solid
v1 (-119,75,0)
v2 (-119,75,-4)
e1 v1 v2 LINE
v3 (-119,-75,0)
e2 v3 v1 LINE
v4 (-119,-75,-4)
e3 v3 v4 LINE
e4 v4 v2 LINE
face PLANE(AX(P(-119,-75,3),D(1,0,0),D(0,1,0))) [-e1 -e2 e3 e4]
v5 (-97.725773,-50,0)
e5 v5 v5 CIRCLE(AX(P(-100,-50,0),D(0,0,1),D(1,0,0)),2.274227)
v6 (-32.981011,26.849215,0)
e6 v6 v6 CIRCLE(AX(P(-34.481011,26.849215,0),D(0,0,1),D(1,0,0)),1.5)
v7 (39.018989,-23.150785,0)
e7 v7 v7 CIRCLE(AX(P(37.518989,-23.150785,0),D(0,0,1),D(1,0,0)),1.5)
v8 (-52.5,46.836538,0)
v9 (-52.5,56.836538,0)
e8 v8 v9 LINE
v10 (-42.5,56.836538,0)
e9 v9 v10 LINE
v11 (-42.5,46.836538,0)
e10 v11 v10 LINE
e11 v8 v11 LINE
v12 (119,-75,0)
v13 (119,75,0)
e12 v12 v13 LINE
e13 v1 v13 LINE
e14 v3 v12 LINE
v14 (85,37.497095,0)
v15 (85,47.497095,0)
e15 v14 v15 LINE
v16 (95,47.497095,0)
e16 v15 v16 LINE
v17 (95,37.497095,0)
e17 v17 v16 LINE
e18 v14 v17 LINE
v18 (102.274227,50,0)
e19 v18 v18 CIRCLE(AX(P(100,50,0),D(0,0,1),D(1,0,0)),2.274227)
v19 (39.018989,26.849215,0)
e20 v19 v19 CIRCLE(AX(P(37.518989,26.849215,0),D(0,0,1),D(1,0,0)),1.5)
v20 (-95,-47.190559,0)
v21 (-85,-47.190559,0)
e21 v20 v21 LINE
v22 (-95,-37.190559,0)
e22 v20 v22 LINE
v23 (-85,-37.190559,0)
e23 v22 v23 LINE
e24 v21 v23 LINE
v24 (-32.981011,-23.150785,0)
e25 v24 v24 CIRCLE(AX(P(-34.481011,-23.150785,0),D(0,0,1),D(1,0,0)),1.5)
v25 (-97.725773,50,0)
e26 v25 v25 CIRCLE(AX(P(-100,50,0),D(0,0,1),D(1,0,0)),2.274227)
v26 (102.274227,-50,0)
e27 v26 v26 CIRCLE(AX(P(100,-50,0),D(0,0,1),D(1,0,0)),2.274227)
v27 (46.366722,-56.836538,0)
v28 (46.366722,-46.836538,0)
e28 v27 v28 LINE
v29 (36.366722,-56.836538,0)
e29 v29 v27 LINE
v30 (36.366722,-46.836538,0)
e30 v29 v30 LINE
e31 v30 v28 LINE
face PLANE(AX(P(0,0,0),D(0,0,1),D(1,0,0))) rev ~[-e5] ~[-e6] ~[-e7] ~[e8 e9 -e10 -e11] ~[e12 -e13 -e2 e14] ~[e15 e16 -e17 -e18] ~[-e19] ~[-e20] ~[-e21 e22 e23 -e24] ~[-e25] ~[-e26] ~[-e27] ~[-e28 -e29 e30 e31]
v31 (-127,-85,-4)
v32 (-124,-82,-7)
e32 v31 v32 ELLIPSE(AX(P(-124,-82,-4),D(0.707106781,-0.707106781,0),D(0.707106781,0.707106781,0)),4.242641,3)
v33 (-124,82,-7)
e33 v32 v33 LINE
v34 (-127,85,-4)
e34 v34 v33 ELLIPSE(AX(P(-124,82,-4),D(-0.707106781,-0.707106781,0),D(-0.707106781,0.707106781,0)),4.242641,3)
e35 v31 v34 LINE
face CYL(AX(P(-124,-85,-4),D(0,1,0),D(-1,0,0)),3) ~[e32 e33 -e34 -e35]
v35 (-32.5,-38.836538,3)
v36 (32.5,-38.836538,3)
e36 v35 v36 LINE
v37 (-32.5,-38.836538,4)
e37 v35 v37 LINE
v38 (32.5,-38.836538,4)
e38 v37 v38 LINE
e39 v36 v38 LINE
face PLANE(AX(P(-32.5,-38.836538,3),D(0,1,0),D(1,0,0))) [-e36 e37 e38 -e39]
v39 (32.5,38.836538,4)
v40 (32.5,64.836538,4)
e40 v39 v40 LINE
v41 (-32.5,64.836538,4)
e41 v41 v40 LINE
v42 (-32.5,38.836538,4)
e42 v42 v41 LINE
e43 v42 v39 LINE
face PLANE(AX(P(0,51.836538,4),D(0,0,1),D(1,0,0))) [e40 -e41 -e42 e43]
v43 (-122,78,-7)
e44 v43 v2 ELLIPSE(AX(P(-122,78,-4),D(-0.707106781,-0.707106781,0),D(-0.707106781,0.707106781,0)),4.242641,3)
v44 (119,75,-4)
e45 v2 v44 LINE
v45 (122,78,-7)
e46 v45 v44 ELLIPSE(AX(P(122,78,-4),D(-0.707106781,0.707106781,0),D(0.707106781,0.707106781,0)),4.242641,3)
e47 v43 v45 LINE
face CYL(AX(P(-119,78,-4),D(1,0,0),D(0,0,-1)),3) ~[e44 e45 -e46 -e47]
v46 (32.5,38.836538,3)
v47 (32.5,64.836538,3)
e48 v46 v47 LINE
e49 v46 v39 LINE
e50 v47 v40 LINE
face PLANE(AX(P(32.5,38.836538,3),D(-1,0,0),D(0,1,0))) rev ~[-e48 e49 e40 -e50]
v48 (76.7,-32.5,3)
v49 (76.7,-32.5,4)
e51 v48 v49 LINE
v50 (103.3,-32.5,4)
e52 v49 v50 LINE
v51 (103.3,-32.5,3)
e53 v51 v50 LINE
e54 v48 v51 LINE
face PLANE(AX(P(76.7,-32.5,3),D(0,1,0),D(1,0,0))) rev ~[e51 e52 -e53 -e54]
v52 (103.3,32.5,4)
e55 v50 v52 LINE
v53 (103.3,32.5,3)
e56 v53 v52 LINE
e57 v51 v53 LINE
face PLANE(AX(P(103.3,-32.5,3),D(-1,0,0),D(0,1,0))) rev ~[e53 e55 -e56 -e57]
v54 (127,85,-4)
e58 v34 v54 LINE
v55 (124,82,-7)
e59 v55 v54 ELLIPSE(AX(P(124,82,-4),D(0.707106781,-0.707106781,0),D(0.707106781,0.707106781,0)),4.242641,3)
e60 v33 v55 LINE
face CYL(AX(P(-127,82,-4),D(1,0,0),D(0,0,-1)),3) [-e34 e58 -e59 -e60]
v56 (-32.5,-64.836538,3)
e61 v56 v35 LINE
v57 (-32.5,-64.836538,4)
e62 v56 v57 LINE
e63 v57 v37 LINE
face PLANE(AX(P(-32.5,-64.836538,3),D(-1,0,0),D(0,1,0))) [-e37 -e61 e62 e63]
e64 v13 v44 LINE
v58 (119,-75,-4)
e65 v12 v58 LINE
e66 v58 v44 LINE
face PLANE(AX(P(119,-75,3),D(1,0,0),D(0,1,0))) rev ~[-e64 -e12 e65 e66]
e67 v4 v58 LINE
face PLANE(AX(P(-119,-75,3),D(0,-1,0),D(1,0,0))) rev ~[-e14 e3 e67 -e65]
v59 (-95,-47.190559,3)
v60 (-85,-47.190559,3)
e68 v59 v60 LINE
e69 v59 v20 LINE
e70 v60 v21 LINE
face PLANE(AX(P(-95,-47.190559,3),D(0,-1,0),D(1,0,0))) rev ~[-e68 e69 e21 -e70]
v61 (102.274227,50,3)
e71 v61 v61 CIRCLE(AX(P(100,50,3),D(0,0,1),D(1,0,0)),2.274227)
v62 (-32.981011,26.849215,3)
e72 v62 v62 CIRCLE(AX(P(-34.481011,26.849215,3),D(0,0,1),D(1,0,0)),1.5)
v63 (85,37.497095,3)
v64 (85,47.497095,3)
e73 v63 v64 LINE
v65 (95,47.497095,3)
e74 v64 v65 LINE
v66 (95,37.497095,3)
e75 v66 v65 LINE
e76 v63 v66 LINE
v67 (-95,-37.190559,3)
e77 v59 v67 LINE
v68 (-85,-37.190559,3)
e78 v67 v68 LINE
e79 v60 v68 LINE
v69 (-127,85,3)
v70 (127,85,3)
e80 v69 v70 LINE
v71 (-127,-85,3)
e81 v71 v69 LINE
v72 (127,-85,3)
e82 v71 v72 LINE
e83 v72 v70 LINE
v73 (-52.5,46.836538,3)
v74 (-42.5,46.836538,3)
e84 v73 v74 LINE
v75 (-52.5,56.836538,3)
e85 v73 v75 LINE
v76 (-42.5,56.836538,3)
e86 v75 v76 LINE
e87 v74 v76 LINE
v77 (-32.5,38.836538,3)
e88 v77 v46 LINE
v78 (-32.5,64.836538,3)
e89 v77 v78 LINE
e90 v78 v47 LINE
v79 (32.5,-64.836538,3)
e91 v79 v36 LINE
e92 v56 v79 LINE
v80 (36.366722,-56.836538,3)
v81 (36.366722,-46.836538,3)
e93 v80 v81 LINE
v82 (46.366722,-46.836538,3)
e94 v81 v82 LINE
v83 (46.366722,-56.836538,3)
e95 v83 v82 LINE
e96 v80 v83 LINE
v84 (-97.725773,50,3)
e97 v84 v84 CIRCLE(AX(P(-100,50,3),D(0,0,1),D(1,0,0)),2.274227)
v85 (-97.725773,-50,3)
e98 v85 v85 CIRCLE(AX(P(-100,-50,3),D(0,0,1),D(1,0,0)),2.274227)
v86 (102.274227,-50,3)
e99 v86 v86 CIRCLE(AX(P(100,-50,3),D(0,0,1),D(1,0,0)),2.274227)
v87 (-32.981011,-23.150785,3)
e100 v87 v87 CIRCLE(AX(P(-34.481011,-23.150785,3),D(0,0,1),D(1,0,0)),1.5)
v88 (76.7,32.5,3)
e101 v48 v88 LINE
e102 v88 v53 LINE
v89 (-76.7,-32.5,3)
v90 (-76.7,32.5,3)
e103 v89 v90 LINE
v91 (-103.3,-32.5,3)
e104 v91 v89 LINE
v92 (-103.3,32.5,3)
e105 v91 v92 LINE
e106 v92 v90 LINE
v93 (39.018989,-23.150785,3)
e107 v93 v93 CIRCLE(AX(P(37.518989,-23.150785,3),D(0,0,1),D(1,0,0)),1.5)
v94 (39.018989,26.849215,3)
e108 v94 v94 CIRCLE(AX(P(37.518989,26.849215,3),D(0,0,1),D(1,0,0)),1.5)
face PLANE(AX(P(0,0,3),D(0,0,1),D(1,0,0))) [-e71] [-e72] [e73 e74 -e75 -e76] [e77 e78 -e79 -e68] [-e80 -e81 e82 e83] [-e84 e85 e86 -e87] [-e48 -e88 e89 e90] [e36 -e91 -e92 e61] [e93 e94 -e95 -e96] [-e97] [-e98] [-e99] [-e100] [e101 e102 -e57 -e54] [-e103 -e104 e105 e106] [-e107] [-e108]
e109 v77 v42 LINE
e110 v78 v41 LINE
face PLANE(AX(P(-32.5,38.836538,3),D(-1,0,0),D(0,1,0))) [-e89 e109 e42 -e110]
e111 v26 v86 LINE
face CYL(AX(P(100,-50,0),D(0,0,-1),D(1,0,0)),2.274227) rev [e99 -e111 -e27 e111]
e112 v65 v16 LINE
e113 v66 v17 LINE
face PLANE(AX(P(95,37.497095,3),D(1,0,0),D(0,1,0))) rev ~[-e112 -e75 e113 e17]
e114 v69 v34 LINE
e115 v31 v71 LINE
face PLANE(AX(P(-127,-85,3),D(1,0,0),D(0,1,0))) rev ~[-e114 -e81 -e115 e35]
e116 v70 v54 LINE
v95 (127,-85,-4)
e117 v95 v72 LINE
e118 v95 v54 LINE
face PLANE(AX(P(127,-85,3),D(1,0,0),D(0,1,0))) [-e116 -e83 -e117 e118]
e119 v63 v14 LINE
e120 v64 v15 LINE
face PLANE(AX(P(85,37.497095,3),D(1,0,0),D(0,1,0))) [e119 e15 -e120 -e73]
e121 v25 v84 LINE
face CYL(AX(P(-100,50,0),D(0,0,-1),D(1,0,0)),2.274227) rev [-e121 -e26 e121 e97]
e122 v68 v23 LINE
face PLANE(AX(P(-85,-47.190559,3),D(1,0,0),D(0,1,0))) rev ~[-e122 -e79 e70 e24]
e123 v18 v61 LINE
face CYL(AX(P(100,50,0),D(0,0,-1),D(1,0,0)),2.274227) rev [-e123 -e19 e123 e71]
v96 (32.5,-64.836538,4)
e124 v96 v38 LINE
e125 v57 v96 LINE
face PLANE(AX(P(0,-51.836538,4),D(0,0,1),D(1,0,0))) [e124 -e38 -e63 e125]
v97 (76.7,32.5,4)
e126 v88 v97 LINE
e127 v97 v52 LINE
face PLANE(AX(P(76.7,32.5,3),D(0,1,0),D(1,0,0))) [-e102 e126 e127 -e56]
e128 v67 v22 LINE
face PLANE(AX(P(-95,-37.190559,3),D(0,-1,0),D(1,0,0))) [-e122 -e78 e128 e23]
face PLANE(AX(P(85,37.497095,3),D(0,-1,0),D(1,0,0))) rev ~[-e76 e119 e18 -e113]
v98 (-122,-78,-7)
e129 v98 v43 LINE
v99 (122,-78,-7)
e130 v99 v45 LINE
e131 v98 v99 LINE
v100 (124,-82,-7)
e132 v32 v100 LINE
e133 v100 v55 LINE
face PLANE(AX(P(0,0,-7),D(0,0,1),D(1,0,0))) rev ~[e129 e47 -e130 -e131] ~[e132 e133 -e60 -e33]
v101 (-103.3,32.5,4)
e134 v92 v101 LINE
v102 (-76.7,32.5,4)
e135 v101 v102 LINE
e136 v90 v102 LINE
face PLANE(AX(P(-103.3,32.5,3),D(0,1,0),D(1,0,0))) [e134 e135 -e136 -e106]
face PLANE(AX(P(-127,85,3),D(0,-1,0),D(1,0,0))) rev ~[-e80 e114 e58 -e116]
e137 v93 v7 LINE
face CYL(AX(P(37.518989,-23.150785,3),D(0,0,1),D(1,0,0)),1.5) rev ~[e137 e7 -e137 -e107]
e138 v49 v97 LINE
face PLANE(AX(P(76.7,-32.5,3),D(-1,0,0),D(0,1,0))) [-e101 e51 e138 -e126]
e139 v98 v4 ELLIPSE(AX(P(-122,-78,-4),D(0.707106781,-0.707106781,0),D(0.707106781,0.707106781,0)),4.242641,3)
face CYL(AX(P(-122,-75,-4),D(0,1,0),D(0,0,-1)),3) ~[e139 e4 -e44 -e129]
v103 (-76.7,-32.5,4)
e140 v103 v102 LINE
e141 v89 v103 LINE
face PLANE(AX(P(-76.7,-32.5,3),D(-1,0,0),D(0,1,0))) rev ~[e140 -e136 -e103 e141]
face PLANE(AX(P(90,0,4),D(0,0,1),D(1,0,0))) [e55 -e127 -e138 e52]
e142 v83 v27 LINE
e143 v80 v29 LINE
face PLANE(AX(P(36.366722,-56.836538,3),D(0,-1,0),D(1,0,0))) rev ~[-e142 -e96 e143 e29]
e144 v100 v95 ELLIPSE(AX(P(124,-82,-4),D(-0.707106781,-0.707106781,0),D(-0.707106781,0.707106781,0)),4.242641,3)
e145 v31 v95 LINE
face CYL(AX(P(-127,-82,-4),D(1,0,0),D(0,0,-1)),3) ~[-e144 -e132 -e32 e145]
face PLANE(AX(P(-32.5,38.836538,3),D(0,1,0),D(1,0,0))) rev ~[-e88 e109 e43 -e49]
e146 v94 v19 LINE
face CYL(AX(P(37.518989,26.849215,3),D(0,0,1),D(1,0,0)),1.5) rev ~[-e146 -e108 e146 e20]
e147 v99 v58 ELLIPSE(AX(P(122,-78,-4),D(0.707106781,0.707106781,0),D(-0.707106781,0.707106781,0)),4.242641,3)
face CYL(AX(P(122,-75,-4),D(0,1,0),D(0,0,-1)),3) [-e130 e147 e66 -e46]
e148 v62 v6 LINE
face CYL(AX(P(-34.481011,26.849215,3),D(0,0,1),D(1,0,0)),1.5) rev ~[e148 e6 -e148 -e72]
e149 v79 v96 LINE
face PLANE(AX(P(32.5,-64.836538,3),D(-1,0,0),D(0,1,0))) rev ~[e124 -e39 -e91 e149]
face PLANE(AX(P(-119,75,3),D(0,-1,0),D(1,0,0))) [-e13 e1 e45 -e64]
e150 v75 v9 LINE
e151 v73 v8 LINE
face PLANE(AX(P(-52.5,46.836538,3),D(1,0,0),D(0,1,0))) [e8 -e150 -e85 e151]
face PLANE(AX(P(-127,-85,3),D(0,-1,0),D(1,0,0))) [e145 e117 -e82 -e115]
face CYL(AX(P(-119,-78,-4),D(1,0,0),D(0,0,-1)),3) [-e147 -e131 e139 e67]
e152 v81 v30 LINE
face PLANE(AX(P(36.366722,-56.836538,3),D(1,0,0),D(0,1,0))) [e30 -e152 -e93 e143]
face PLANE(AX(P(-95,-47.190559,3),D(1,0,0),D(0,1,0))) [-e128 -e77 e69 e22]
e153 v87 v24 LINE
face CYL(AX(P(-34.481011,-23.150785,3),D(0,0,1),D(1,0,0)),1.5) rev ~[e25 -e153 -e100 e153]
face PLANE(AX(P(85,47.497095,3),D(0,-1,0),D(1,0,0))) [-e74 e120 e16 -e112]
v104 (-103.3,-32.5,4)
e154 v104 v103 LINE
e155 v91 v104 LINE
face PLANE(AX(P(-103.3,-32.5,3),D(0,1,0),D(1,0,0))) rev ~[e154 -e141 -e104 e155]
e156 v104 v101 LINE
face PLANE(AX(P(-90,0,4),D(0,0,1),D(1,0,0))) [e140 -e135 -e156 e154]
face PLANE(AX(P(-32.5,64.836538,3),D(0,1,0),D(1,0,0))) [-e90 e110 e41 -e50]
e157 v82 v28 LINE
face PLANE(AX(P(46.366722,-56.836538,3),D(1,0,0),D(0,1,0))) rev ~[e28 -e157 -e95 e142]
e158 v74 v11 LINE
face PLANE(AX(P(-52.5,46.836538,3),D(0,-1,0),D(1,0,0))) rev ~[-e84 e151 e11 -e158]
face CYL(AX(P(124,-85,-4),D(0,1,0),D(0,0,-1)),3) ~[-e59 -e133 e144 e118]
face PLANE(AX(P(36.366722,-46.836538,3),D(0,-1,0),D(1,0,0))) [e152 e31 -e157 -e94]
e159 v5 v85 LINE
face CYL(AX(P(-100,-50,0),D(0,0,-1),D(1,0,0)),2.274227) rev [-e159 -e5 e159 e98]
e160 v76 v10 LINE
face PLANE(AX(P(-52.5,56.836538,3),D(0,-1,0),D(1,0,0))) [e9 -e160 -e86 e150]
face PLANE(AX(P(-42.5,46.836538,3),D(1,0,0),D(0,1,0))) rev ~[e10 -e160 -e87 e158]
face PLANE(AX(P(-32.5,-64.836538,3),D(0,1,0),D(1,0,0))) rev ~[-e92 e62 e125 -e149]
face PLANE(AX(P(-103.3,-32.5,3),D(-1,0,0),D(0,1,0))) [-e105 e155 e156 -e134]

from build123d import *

# Parameters (mm, degrees)
F0_W      = 254
F0_H      = 170
F0_R      = 2.2742272187
F1_DEPTH  = 3
F2_W      = 254
F2_H      = 170
F2_W_2    = 238
F2_H_2    = 150
F3_DEPTH  = 10
F4_R      = 3
F5_R      = 1.5
F6_DEPTH  = 25
F7_W      = 26.6
F7_H      = 65
F7_W_2    = 65
F7_H_2    = 26
F8_DEPTH  = 1
F9_W      = 10
F9_H      = 10
F10_DEPTH = 25


# Not quite as in the source:
# - a feature names something its author has since deleted; it is built from what else it names


with BuildPart() as f1:
    # F0 (on Top) → F1 (new body)
    with BuildSketch(Plane.XY):
        Rectangle(F0_W, F0_H)
        with Locations((-100, -50)):
            Circle(F0_R, mode=Mode.SUBTRACT)
        with Locations((100, -50)):
            Circle(F0_R, mode=Mode.SUBTRACT)
        with Locations((-100, 50)):
            Circle(F0_R, mode=Mode.SUBTRACT)
        with Locations((100, 50)):
            Circle(F0_R, mode=Mode.SUBTRACT)
    extrude(amount=F1_DEPTH)

    # F2 (on face) → F3 (join)
    with BuildSketch(Plane.XY.offset(3)):
        Rectangle(F2_W, F2_H)
        Rectangle(F2_W_2, F2_H_2, mode=Mode.SUBTRACT)
    extrude(amount=-F3_DEPTH)

    # F4
    f4_edges = [f1.edges().sort_by_distance(p)[0] for p in [
        (-127, 0, -7),
        (-119, 0, -7),
        (0, 75, -7),
        (0, 85, -7),
        (119, 0, -7),
        (127, 0, -7),
        (0, -75, -7),
        (0, -85, -7),
    ]]
    fillet(f4_edges, radius=F4_R)

    # F5 (on face) → F6 (cut)
    with BuildSketch(Plane.XY.offset(3)):
        with Locations((-34.4810113311, -23.1507848948)):
            Circle(F5_R)
        with Locations((-34.4810113311, 26.8492151052)):
            Circle(F5_R)
        with Locations((37.5189886689, -23.1507848948)):
            Circle(F5_R)
        with Locations((37.5189886689, 26.8492151052)):
            Circle(F5_R)
    extrude(amount=-F6_DEPTH, mode=Mode.SUBTRACT)

    # F7 (on face) → F8 (join)
    with BuildSketch(Plane.XY.offset(3)):
        with Locations((-90, 0)):
            Rectangle(F7_W, F7_H)
        with Locations((0, 51.8365384532)):
            Rectangle(F7_W_2, F7_H_2)
        with Locations((0, -51.8365384532)):
            Rectangle(F7_W_2, F7_H_2)
        with Locations((90, 0)):
            Rectangle(F7_W, F7_H)
    extrude(amount=F8_DEPTH)

    # F9 (on face) → F10 (cut)
    with BuildSketch(Plane.XY.offset(3)):
        with Locations((-47.5, 51.8365384532)):
            Rectangle(F9_W, F9_H)
        with Locations((90, 42.4970947206)):
            Rectangle(F9_W, F9_H)
        with Locations((41.3667224348, -51.8365384532)):
            Rectangle(F9_W, F9_H)
        with Locations((-90, -42.1905592084)):
            Rectangle(F9_W, F9_H)
    extrude(amount=-F10_DEPTH, mode=Mode.SUBTRACT)


solid = f1.part
